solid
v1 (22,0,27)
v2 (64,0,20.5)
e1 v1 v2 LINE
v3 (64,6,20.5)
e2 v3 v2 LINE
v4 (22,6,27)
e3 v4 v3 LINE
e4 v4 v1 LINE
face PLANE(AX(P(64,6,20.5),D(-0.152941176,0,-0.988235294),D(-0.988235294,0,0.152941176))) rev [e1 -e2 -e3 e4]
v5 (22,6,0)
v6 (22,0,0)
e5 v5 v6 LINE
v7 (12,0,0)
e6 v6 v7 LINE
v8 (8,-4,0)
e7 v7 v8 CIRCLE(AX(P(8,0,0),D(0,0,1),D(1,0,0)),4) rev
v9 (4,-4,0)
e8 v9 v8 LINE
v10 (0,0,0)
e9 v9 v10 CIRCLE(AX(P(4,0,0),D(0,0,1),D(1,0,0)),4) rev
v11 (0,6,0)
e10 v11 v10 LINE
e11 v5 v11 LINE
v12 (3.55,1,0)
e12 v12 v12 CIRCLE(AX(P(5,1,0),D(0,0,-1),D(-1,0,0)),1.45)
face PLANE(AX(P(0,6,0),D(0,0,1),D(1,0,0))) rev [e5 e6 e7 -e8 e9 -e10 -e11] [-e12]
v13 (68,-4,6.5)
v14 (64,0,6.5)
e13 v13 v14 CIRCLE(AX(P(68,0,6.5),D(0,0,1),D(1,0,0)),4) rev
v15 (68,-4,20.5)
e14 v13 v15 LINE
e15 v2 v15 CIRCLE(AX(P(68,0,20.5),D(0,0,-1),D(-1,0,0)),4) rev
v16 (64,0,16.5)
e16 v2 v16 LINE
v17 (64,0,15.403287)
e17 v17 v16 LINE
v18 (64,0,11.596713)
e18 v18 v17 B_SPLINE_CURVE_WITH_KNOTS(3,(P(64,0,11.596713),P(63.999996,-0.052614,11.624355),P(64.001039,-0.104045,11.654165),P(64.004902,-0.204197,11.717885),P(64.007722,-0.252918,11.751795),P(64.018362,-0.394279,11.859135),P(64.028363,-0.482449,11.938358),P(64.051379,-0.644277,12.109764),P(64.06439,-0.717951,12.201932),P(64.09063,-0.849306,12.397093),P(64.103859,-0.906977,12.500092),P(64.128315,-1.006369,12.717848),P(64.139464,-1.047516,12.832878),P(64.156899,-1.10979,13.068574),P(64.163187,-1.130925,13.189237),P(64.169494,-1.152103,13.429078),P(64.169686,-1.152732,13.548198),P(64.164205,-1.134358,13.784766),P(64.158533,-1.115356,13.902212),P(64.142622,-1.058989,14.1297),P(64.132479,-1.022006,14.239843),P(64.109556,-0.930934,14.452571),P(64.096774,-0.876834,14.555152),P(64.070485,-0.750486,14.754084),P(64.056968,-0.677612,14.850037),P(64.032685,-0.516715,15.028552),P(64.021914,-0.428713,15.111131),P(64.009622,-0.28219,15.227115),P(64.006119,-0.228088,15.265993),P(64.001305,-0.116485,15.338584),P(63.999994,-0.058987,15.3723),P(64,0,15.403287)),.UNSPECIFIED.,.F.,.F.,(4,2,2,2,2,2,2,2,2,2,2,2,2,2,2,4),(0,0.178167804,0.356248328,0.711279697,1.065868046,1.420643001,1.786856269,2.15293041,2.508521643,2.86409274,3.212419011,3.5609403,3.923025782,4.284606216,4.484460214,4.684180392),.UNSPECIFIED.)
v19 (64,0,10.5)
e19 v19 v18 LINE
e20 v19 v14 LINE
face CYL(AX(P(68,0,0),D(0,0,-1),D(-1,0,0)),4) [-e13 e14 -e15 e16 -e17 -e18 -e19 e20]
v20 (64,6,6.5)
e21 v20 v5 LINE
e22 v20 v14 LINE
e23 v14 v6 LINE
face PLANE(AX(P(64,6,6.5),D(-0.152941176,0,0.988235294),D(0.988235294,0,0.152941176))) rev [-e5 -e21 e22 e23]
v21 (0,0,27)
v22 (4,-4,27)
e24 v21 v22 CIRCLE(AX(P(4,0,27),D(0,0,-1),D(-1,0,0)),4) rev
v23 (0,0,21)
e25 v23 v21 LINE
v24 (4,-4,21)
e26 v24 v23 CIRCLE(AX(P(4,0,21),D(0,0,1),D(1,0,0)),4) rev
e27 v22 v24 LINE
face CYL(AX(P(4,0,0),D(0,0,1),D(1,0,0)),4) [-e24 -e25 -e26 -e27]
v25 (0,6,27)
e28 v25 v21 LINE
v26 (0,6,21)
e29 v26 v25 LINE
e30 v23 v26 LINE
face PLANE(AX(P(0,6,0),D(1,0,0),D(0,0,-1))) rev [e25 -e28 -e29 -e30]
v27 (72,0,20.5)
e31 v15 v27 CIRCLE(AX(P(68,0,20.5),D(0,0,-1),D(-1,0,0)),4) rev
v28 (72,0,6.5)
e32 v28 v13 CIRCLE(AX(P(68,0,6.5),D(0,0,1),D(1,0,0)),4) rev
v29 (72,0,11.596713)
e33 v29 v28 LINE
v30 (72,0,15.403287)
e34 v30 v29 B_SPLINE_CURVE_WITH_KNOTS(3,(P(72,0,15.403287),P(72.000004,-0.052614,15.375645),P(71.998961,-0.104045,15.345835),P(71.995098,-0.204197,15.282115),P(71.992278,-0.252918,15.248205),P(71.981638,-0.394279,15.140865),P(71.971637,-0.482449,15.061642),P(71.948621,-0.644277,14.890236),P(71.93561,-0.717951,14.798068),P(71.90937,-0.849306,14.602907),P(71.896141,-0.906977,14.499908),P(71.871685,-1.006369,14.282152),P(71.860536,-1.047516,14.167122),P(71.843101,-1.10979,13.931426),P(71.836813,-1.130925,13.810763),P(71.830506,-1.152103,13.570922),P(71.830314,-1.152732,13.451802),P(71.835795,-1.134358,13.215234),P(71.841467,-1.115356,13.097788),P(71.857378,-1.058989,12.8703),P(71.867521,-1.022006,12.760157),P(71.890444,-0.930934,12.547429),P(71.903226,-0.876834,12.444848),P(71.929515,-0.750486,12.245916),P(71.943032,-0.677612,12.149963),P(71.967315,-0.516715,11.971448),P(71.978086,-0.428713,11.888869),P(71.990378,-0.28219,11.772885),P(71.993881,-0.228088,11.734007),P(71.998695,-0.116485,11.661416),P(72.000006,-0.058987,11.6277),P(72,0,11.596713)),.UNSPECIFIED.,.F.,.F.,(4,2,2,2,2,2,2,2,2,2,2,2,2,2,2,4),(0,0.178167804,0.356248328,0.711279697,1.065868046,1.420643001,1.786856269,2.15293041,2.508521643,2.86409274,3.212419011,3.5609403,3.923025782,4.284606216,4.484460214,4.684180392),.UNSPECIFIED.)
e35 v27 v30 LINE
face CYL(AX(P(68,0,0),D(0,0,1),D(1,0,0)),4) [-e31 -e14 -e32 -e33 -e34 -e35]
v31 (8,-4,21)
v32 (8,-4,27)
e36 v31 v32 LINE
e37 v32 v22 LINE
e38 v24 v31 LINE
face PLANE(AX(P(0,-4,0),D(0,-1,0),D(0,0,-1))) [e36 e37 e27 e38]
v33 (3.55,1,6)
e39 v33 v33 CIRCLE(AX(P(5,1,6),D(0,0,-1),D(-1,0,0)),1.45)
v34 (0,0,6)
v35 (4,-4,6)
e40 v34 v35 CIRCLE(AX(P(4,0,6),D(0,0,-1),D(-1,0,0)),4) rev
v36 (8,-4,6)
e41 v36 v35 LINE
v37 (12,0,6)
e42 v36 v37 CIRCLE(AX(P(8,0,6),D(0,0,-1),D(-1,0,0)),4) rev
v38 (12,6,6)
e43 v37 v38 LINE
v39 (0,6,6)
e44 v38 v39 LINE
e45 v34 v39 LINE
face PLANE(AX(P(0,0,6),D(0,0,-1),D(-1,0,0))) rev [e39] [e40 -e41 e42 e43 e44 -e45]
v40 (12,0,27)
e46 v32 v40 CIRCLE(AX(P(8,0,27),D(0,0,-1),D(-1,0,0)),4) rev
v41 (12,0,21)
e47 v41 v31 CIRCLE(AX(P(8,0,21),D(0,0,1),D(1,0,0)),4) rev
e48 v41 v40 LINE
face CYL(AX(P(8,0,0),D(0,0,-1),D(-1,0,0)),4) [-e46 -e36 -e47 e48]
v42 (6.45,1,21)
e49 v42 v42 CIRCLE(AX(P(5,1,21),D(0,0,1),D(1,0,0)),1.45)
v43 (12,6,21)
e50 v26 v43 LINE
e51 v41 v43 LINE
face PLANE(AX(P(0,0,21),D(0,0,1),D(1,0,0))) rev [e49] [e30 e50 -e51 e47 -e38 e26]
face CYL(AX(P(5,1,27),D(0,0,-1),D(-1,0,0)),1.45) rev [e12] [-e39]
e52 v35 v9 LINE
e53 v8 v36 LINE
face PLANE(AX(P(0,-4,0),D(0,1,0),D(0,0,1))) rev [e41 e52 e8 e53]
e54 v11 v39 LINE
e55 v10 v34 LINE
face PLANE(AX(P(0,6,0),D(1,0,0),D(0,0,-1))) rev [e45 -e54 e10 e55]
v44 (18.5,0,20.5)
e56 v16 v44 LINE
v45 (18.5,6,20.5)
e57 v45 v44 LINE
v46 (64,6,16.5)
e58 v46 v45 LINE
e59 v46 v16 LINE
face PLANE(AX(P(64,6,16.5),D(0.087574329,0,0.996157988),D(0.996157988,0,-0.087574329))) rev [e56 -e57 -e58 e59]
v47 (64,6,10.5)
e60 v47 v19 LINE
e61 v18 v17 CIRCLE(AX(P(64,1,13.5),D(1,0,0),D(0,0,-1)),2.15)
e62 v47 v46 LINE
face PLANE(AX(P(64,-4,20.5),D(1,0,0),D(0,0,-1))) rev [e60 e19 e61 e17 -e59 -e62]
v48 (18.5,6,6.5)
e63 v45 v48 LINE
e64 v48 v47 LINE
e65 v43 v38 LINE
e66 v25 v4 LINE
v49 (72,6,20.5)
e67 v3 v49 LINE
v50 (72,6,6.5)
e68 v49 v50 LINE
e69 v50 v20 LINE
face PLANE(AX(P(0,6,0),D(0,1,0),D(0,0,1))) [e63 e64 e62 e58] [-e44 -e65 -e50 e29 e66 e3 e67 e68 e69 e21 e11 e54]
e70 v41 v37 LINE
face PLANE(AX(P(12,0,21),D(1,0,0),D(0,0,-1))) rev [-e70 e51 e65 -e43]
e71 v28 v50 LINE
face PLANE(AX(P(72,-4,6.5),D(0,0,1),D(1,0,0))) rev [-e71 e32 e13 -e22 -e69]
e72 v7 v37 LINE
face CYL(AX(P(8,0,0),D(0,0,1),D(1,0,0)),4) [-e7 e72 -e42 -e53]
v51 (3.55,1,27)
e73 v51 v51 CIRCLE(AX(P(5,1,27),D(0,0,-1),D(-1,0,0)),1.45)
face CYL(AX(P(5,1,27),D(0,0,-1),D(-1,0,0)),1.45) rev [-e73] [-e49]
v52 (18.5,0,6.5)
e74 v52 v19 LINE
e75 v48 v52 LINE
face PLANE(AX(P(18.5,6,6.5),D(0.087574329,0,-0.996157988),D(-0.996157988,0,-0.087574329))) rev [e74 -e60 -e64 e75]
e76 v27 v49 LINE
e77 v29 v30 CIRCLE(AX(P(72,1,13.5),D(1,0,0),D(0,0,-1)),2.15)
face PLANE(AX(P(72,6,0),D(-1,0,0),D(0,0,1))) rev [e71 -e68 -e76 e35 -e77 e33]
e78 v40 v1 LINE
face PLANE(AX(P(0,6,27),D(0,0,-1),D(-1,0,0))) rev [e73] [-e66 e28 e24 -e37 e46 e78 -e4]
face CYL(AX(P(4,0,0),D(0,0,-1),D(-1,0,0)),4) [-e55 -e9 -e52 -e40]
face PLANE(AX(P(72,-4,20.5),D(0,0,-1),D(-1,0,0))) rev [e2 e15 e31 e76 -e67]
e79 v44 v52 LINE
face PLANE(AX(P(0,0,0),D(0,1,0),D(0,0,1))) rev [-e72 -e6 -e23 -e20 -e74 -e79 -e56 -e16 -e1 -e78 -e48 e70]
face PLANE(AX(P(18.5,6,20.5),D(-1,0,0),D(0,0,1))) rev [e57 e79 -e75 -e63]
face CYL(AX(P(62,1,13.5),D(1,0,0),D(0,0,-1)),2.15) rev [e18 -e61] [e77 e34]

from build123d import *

# Parameters (mm, degrees)
SKETCH1_W           = 72
SKETCH1_H           = 27
BOSS_EXTRUDE1_DEPTH = 6
SKETCH2_W           = 12
SKETCH2_H           = 15
CUT_EXTRUDE1_DEPTH  = 78.129760793
SKETCH3_W           = 8
SKETCH3_H           = 14
BOSS_EXTRUDE2_DEPTH = 4
CUT_EXTRUDE2_DEPTH  = 78.129760793
SKETCH5_W           = 12
SKETCH5_H           = 6
BOSS_EXTRUDE3_DEPTH = 4
CUT_EXTRUDE4_DEPTH  = 78.129760793
SKETCH8_R           = 2.15
CUT_EXTRUDE5_DEPTH  = 10
SKETCH9_R           = 1.45
CUT_EXTRUDE6_DEPTH  = 78.129760793
FILLET2_R           = 4


with BuildPart() as part:
    # Sketch1 → Boss-Extrude1 (new body)
    with BuildSketch(Plane(origin=(0, 0, 0), x_dir=(1, 0, 0), z_dir=(0, 1, 0))):
        with Locations((36, -13.5)):
            Rectangle(SKETCH1_W, SKETCH1_H)
    extrude(amount=BOSS_EXTRUDE1_DEPTH)

    # Sketch2 → Cut-Extrude1 (cut, through all)
    with BuildSketch(Plane(origin=(0, 6, 0), x_dir=(1, 0, 0), z_dir=(0, 1, 0))):
        with Locations((6, -13.5)):
            Rectangle(SKETCH2_W, SKETCH2_H)
    extrude(amount=-CUT_EXTRUDE1_DEPTH, mode=Mode.SUBTRACT)

    # Sketch3 → Boss-Extrude2 (add)
    with BuildSketch(Plane(origin=(0, 0, 0), x_dir=(-1, 0, 0), z_dir=(0, -1, 0))):
        with Locations((-68, -13.5)):
            Rectangle(SKETCH3_W, SKETCH3_H)
    extrude(amount=BOSS_EXTRUDE2_DEPTH)

    # Sketch4 → Cut-Extrude2 (cut, through all)
    with BuildSketch(Plane(origin=(0, 0, 0), x_dir=(-1, 0, 0), z_dir=(0, -1, 0))):
        Polygon((-64, -20.5), (-22, -27), (-72, -27), (-72, -20.5), align=None)
        Polygon((-64, -6.5), (-22, 0), (-72, 0), (-72, -6.5), align=None)
    extrude(amount=-CUT_EXTRUDE2_DEPTH, mode=Mode.SUBTRACT)

    # Sketch5 → Boss-Extrude3 (add)
    with BuildSketch(Plane.XZ):
        with Locations((6, 3)):
            Rectangle(SKETCH5_W, SKETCH5_H)
        with Locations((6, 24)):
            Rectangle(SKETCH5_W, SKETCH5_H)
    extrude(amount=BOSS_EXTRUDE3_DEPTH)

    # Sketch7 → Cut-Extrude4 (cut, through all)
    with BuildSketch(Plane(origin=(0, 0, 0), x_dir=(-1, 0, 0), z_dir=(0, -1, 0))):
        Polygon((-18.5, -20.5), (-18.5, -6.5), (-64, -10.5), (-64, -16.5), align=None)
    extrude(amount=-CUT_EXTRUDE4_DEPTH, mode=Mode.SUBTRACT)

    # Sketch8 → Cut-Extrude5 (cut)
    with BuildSketch(Plane(origin=(72, 0, 0), x_dir=(0, 0, -1), z_dir=(1, 0, 0))):
        with Locations((-13.5, 1)):
            Circle(SKETCH8_R)
    extrude(amount=-CUT_EXTRUDE5_DEPTH, mode=Mode.SUBTRACT)

    # Sketch9 → Cut-Extrude6 (cut, through all)
    with BuildSketch(Plane(origin=(0, 0, 0), x_dir=(-1, 0, 0), z_dir=(0, 0, -1))):
        with Locations((-5, 1)):
            Circle(SKETCH9_R)
    extrude(amount=-CUT_EXTRUDE6_DEPTH, mode=Mode.SUBTRACT)

    # Fillet2
    # the kernel refuses this fillet: 4 mm, written as the material it takes off along each edge
    with BuildSketch(Plane(origin=(0, -4, 11), x_dir=(0, 1, 0), z_dir=(0, 0, 1)), Plane(origin=(0, -4, 16), x_dir=(1, 0, 0), z_dir=(0, 0, -1)), Plane(origin=(12, -4, 37), x_dir=(0, 1, 0), z_dir=(0, 0, -1))) as fillet2_piece_1:
        with BuildLine():
            CenterArc((FILLET2_R, -FILLET2_R), FILLET2_R, 90, 90)
            Line((0, -FILLET2_R), (0, 0))
            Line((0, 0), (FILLET2_R, 0))
        make_face()
    extrude(amount=26, mode=Mode.SUBTRACT)
    with BuildSketch(Plane(origin=(12, -4, -10), x_dir=(0, 1, 0), z_dir=(0, 0, 1))) as fillet2_piece_2:
        with BuildLine():
            CenterArc((FILLET2_R, FILLET2_R), FILLET2_R, 180, 90)
            Line((0, FILLET2_R), (0, 0))
            Line((0, 0), (FILLET2_R, 0))
        make_face()
    extrude(amount=26, mode=Mode.SUBTRACT)
    with BuildSketch(Plane(origin=(72, -4, -3.5), x_dir=(0, 1, 0), z_dir=(0, 0, 1)), Plane(origin=(64, -4, 30.5), x_dir=(0, 1, 0), z_dir=(0, 0, -1))) as fillet2_piece_3:
        with BuildLine():
            CenterArc((FILLET2_R, FILLET2_R), FILLET2_R, 180, 90)
            Line((0, FILLET2_R), (0, 0))
            Line((0, 0), (FILLET2_R, 0))
        make_face()
    extrude(amount=34, mode=Mode.SUBTRACT)


solid = part.part
